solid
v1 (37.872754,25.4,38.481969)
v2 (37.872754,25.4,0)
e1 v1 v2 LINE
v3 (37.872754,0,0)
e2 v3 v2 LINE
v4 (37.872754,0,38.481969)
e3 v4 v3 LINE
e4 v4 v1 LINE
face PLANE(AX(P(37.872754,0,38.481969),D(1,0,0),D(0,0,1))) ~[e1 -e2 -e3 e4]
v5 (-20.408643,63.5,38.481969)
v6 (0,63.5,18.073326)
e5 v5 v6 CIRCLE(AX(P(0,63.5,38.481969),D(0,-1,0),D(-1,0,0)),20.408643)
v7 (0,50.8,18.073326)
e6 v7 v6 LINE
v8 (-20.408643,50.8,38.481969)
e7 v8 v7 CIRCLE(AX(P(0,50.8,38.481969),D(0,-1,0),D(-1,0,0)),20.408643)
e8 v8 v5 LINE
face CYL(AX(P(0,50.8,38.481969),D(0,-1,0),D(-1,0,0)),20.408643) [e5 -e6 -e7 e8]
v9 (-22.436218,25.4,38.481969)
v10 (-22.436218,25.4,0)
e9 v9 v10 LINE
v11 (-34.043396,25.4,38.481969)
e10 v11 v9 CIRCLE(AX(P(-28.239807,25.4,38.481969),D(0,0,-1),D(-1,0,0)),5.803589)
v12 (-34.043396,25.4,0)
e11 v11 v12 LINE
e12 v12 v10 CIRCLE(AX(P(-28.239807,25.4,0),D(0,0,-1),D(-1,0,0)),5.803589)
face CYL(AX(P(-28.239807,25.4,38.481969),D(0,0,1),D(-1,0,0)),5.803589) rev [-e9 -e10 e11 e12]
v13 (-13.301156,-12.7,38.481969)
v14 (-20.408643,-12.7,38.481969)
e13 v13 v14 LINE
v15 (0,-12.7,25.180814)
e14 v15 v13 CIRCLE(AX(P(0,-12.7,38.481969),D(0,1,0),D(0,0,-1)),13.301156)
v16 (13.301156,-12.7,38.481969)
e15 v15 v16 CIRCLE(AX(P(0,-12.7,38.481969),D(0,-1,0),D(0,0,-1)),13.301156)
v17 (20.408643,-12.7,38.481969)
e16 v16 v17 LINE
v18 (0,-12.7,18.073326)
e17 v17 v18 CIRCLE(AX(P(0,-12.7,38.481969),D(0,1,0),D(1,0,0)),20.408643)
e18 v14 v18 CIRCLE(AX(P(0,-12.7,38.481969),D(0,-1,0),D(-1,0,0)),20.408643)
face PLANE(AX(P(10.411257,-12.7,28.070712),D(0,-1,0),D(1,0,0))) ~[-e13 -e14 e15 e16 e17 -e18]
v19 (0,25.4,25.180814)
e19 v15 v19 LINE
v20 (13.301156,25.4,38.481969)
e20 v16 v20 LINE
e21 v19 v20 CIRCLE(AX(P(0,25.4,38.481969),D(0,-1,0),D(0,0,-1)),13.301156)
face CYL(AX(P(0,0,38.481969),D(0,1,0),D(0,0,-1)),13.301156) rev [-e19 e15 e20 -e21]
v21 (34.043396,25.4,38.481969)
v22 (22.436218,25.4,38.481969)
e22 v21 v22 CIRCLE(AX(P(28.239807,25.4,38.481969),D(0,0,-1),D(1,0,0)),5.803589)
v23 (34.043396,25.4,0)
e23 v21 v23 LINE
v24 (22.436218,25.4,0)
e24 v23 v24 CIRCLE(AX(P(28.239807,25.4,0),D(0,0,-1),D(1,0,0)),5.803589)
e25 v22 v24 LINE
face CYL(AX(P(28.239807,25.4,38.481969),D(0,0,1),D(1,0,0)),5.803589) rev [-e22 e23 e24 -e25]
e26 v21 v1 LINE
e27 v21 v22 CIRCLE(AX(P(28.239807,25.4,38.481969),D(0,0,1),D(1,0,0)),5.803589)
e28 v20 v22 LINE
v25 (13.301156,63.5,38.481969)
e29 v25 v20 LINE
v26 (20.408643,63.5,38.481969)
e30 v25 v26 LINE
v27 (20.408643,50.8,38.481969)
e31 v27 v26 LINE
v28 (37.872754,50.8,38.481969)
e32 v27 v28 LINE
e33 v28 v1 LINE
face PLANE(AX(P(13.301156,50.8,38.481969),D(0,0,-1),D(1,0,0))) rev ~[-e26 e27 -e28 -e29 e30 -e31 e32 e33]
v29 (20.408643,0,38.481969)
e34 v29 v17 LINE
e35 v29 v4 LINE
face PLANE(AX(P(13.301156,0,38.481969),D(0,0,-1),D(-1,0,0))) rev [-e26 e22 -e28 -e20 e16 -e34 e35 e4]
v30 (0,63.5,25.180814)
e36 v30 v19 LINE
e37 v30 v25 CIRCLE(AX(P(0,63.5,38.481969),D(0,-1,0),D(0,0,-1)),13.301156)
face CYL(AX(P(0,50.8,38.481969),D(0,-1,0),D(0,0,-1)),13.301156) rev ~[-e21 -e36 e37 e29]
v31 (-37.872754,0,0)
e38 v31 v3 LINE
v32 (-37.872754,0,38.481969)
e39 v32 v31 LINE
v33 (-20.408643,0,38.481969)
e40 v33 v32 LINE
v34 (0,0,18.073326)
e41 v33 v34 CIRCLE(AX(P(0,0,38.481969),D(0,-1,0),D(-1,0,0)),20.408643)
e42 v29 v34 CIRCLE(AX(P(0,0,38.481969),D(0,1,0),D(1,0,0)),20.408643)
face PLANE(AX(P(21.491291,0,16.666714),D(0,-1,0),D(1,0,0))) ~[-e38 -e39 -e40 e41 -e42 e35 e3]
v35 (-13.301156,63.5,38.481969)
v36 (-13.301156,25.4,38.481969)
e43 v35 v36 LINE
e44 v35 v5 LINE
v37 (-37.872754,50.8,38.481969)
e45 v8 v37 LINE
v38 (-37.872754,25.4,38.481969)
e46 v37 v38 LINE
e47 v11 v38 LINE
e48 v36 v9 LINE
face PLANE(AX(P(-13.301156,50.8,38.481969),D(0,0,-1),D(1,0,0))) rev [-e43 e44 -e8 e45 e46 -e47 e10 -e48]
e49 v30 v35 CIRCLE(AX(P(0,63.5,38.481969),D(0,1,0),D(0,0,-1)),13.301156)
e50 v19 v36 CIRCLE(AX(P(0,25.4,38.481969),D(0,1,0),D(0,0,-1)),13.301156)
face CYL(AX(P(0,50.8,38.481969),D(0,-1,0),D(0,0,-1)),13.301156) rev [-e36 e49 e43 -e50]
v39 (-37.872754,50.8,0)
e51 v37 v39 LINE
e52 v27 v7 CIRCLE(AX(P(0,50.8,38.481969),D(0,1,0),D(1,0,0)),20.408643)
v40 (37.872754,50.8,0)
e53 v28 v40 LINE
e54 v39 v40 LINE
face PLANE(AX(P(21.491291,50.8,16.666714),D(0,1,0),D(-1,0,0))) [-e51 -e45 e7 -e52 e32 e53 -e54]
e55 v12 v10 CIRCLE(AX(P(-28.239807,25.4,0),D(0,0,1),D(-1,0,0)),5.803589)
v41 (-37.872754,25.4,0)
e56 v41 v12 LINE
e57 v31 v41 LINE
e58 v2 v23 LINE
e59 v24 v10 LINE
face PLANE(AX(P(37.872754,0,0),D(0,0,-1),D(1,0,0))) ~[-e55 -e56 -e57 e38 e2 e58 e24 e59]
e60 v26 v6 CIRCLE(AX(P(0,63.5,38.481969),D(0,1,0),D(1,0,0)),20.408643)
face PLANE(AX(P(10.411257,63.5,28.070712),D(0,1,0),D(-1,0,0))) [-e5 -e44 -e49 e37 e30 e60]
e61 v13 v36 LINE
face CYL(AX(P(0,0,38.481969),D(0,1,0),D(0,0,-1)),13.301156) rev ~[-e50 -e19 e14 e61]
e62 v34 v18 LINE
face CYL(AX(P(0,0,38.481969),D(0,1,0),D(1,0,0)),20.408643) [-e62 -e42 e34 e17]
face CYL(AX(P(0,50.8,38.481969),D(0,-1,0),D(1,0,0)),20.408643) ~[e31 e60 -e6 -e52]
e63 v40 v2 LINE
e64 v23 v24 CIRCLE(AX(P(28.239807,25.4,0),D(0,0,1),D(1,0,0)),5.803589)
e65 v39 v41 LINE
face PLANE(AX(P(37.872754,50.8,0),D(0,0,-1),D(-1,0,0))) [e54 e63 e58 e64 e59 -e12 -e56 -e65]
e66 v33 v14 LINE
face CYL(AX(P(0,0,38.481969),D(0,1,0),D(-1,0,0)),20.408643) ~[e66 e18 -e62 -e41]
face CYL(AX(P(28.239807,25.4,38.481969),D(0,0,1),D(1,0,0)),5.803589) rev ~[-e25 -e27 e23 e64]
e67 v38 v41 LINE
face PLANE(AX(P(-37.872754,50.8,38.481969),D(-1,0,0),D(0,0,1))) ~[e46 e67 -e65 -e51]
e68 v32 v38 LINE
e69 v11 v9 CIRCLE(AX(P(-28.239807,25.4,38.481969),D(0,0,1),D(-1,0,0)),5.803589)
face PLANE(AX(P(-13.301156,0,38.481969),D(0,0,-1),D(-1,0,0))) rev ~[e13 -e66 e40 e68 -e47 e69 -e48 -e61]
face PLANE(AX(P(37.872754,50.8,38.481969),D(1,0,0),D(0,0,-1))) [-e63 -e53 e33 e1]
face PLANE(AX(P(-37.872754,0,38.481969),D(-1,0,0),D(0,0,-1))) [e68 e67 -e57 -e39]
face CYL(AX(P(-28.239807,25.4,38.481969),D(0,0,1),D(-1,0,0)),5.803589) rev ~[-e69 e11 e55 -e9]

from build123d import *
from build123d import SkipClean  # not in build123d's __all__

# Parameters (mm, degrees)
F1_DEPTH = 25.4
F2_DEPTH = 12.7
F4_DEPTH = 254


with BuildPart() as f1:
    # F0 (on Front) → F1 (new body)
    with BuildSketch(Plane.XZ):
        with BuildLine():
            Line((-37.8727540374, 38.4819693863), (-37.8727540374, 0))
            Line((-37.8727540374, 0), (0, 0))
            Line((0, 0), (0, 18.0733259767))
            ThreePointArc((0, 18.0733259767), (-14.4310901498, 24.0508792366), (-20.4086434096, 38.4819693863))
            Line((-20.4086434096, 38.4819693863), (-37.8727540374, 38.4819693863))
        make_face()
        with BuildLine():
            Line((-13.3011555299, 38.4819693863), (-20.4086434096, 38.4819693863))
            ThreePointArc((-20.4086434096, 38.4819693863), (-14.4310901498, 24.0508792366), (0, 18.0733259767))
            Line((0, 18.0733259767), (0, 25.1808138564))
            ThreePointArc((0, 25.1808138564), (-9.4053372728, 29.0766321135), (-13.3011555299, 38.4819693863))
        make_face()
    extrude(amount=-F1_DEPTH)

    # F0 (on Front) → F2 (join)
    with BuildSketch(Plane.XZ):
        with BuildLine():
            Line((-13.3011555299, 38.4819693863), (-20.4086434096, 38.4819693863))
            ThreePointArc((-20.4086434096, 38.4819693863), (-14.4310901498, 24.0508792366), (0, 18.0733259767))
            Line((0, 18.0733259767), (0, 25.1808138564))
            ThreePointArc((0, 25.1808138564), (-9.4053372728, 29.0766321135), (-13.3011555299, 38.4819693863))
        make_face()
    extrude(amount=F2_DEPTH)

    # F3 (on face) → F4 (cut)
    with BuildSketch(Plane.XY.offset(38.4819693863)):
        with BuildLine():
            ThreePointArc((-34.0433958918, 25.4), (-28.239807114, 19.5964112222), (-22.4362183362, 25.4))
            Line((-22.4362183362, 25.4), (-34.0433958918, 25.4))
        make_face()
    extrude(amount=-F4_DEPTH, mode=Mode.SUBTRACT)

    # F5: F1 across face


with BuildPart() as f1_1:
    add(f1.part, clean=False)
    add(f1.part.mirror(Plane(origin=(0, 10.3439929045, 13.7080154385), x_dir=(0, 1, 0), z_dir=(1, 0, 0))), clean=False)

    # F6: F1 across face


with BuildPart() as f1_2:
    add(f1_1.part, clean=False)
    with SkipClean():  # cleaning this boolean's faces spoils the solid; the shape is the same uncleaned
        add(f1_1.part.mirror(Plane(origin=(0, 25.4, 16.6331926938), x_dir=(-1, 0, 0), z_dir=(0, 1, 0))), clean=False)


solid = f1_2.part
